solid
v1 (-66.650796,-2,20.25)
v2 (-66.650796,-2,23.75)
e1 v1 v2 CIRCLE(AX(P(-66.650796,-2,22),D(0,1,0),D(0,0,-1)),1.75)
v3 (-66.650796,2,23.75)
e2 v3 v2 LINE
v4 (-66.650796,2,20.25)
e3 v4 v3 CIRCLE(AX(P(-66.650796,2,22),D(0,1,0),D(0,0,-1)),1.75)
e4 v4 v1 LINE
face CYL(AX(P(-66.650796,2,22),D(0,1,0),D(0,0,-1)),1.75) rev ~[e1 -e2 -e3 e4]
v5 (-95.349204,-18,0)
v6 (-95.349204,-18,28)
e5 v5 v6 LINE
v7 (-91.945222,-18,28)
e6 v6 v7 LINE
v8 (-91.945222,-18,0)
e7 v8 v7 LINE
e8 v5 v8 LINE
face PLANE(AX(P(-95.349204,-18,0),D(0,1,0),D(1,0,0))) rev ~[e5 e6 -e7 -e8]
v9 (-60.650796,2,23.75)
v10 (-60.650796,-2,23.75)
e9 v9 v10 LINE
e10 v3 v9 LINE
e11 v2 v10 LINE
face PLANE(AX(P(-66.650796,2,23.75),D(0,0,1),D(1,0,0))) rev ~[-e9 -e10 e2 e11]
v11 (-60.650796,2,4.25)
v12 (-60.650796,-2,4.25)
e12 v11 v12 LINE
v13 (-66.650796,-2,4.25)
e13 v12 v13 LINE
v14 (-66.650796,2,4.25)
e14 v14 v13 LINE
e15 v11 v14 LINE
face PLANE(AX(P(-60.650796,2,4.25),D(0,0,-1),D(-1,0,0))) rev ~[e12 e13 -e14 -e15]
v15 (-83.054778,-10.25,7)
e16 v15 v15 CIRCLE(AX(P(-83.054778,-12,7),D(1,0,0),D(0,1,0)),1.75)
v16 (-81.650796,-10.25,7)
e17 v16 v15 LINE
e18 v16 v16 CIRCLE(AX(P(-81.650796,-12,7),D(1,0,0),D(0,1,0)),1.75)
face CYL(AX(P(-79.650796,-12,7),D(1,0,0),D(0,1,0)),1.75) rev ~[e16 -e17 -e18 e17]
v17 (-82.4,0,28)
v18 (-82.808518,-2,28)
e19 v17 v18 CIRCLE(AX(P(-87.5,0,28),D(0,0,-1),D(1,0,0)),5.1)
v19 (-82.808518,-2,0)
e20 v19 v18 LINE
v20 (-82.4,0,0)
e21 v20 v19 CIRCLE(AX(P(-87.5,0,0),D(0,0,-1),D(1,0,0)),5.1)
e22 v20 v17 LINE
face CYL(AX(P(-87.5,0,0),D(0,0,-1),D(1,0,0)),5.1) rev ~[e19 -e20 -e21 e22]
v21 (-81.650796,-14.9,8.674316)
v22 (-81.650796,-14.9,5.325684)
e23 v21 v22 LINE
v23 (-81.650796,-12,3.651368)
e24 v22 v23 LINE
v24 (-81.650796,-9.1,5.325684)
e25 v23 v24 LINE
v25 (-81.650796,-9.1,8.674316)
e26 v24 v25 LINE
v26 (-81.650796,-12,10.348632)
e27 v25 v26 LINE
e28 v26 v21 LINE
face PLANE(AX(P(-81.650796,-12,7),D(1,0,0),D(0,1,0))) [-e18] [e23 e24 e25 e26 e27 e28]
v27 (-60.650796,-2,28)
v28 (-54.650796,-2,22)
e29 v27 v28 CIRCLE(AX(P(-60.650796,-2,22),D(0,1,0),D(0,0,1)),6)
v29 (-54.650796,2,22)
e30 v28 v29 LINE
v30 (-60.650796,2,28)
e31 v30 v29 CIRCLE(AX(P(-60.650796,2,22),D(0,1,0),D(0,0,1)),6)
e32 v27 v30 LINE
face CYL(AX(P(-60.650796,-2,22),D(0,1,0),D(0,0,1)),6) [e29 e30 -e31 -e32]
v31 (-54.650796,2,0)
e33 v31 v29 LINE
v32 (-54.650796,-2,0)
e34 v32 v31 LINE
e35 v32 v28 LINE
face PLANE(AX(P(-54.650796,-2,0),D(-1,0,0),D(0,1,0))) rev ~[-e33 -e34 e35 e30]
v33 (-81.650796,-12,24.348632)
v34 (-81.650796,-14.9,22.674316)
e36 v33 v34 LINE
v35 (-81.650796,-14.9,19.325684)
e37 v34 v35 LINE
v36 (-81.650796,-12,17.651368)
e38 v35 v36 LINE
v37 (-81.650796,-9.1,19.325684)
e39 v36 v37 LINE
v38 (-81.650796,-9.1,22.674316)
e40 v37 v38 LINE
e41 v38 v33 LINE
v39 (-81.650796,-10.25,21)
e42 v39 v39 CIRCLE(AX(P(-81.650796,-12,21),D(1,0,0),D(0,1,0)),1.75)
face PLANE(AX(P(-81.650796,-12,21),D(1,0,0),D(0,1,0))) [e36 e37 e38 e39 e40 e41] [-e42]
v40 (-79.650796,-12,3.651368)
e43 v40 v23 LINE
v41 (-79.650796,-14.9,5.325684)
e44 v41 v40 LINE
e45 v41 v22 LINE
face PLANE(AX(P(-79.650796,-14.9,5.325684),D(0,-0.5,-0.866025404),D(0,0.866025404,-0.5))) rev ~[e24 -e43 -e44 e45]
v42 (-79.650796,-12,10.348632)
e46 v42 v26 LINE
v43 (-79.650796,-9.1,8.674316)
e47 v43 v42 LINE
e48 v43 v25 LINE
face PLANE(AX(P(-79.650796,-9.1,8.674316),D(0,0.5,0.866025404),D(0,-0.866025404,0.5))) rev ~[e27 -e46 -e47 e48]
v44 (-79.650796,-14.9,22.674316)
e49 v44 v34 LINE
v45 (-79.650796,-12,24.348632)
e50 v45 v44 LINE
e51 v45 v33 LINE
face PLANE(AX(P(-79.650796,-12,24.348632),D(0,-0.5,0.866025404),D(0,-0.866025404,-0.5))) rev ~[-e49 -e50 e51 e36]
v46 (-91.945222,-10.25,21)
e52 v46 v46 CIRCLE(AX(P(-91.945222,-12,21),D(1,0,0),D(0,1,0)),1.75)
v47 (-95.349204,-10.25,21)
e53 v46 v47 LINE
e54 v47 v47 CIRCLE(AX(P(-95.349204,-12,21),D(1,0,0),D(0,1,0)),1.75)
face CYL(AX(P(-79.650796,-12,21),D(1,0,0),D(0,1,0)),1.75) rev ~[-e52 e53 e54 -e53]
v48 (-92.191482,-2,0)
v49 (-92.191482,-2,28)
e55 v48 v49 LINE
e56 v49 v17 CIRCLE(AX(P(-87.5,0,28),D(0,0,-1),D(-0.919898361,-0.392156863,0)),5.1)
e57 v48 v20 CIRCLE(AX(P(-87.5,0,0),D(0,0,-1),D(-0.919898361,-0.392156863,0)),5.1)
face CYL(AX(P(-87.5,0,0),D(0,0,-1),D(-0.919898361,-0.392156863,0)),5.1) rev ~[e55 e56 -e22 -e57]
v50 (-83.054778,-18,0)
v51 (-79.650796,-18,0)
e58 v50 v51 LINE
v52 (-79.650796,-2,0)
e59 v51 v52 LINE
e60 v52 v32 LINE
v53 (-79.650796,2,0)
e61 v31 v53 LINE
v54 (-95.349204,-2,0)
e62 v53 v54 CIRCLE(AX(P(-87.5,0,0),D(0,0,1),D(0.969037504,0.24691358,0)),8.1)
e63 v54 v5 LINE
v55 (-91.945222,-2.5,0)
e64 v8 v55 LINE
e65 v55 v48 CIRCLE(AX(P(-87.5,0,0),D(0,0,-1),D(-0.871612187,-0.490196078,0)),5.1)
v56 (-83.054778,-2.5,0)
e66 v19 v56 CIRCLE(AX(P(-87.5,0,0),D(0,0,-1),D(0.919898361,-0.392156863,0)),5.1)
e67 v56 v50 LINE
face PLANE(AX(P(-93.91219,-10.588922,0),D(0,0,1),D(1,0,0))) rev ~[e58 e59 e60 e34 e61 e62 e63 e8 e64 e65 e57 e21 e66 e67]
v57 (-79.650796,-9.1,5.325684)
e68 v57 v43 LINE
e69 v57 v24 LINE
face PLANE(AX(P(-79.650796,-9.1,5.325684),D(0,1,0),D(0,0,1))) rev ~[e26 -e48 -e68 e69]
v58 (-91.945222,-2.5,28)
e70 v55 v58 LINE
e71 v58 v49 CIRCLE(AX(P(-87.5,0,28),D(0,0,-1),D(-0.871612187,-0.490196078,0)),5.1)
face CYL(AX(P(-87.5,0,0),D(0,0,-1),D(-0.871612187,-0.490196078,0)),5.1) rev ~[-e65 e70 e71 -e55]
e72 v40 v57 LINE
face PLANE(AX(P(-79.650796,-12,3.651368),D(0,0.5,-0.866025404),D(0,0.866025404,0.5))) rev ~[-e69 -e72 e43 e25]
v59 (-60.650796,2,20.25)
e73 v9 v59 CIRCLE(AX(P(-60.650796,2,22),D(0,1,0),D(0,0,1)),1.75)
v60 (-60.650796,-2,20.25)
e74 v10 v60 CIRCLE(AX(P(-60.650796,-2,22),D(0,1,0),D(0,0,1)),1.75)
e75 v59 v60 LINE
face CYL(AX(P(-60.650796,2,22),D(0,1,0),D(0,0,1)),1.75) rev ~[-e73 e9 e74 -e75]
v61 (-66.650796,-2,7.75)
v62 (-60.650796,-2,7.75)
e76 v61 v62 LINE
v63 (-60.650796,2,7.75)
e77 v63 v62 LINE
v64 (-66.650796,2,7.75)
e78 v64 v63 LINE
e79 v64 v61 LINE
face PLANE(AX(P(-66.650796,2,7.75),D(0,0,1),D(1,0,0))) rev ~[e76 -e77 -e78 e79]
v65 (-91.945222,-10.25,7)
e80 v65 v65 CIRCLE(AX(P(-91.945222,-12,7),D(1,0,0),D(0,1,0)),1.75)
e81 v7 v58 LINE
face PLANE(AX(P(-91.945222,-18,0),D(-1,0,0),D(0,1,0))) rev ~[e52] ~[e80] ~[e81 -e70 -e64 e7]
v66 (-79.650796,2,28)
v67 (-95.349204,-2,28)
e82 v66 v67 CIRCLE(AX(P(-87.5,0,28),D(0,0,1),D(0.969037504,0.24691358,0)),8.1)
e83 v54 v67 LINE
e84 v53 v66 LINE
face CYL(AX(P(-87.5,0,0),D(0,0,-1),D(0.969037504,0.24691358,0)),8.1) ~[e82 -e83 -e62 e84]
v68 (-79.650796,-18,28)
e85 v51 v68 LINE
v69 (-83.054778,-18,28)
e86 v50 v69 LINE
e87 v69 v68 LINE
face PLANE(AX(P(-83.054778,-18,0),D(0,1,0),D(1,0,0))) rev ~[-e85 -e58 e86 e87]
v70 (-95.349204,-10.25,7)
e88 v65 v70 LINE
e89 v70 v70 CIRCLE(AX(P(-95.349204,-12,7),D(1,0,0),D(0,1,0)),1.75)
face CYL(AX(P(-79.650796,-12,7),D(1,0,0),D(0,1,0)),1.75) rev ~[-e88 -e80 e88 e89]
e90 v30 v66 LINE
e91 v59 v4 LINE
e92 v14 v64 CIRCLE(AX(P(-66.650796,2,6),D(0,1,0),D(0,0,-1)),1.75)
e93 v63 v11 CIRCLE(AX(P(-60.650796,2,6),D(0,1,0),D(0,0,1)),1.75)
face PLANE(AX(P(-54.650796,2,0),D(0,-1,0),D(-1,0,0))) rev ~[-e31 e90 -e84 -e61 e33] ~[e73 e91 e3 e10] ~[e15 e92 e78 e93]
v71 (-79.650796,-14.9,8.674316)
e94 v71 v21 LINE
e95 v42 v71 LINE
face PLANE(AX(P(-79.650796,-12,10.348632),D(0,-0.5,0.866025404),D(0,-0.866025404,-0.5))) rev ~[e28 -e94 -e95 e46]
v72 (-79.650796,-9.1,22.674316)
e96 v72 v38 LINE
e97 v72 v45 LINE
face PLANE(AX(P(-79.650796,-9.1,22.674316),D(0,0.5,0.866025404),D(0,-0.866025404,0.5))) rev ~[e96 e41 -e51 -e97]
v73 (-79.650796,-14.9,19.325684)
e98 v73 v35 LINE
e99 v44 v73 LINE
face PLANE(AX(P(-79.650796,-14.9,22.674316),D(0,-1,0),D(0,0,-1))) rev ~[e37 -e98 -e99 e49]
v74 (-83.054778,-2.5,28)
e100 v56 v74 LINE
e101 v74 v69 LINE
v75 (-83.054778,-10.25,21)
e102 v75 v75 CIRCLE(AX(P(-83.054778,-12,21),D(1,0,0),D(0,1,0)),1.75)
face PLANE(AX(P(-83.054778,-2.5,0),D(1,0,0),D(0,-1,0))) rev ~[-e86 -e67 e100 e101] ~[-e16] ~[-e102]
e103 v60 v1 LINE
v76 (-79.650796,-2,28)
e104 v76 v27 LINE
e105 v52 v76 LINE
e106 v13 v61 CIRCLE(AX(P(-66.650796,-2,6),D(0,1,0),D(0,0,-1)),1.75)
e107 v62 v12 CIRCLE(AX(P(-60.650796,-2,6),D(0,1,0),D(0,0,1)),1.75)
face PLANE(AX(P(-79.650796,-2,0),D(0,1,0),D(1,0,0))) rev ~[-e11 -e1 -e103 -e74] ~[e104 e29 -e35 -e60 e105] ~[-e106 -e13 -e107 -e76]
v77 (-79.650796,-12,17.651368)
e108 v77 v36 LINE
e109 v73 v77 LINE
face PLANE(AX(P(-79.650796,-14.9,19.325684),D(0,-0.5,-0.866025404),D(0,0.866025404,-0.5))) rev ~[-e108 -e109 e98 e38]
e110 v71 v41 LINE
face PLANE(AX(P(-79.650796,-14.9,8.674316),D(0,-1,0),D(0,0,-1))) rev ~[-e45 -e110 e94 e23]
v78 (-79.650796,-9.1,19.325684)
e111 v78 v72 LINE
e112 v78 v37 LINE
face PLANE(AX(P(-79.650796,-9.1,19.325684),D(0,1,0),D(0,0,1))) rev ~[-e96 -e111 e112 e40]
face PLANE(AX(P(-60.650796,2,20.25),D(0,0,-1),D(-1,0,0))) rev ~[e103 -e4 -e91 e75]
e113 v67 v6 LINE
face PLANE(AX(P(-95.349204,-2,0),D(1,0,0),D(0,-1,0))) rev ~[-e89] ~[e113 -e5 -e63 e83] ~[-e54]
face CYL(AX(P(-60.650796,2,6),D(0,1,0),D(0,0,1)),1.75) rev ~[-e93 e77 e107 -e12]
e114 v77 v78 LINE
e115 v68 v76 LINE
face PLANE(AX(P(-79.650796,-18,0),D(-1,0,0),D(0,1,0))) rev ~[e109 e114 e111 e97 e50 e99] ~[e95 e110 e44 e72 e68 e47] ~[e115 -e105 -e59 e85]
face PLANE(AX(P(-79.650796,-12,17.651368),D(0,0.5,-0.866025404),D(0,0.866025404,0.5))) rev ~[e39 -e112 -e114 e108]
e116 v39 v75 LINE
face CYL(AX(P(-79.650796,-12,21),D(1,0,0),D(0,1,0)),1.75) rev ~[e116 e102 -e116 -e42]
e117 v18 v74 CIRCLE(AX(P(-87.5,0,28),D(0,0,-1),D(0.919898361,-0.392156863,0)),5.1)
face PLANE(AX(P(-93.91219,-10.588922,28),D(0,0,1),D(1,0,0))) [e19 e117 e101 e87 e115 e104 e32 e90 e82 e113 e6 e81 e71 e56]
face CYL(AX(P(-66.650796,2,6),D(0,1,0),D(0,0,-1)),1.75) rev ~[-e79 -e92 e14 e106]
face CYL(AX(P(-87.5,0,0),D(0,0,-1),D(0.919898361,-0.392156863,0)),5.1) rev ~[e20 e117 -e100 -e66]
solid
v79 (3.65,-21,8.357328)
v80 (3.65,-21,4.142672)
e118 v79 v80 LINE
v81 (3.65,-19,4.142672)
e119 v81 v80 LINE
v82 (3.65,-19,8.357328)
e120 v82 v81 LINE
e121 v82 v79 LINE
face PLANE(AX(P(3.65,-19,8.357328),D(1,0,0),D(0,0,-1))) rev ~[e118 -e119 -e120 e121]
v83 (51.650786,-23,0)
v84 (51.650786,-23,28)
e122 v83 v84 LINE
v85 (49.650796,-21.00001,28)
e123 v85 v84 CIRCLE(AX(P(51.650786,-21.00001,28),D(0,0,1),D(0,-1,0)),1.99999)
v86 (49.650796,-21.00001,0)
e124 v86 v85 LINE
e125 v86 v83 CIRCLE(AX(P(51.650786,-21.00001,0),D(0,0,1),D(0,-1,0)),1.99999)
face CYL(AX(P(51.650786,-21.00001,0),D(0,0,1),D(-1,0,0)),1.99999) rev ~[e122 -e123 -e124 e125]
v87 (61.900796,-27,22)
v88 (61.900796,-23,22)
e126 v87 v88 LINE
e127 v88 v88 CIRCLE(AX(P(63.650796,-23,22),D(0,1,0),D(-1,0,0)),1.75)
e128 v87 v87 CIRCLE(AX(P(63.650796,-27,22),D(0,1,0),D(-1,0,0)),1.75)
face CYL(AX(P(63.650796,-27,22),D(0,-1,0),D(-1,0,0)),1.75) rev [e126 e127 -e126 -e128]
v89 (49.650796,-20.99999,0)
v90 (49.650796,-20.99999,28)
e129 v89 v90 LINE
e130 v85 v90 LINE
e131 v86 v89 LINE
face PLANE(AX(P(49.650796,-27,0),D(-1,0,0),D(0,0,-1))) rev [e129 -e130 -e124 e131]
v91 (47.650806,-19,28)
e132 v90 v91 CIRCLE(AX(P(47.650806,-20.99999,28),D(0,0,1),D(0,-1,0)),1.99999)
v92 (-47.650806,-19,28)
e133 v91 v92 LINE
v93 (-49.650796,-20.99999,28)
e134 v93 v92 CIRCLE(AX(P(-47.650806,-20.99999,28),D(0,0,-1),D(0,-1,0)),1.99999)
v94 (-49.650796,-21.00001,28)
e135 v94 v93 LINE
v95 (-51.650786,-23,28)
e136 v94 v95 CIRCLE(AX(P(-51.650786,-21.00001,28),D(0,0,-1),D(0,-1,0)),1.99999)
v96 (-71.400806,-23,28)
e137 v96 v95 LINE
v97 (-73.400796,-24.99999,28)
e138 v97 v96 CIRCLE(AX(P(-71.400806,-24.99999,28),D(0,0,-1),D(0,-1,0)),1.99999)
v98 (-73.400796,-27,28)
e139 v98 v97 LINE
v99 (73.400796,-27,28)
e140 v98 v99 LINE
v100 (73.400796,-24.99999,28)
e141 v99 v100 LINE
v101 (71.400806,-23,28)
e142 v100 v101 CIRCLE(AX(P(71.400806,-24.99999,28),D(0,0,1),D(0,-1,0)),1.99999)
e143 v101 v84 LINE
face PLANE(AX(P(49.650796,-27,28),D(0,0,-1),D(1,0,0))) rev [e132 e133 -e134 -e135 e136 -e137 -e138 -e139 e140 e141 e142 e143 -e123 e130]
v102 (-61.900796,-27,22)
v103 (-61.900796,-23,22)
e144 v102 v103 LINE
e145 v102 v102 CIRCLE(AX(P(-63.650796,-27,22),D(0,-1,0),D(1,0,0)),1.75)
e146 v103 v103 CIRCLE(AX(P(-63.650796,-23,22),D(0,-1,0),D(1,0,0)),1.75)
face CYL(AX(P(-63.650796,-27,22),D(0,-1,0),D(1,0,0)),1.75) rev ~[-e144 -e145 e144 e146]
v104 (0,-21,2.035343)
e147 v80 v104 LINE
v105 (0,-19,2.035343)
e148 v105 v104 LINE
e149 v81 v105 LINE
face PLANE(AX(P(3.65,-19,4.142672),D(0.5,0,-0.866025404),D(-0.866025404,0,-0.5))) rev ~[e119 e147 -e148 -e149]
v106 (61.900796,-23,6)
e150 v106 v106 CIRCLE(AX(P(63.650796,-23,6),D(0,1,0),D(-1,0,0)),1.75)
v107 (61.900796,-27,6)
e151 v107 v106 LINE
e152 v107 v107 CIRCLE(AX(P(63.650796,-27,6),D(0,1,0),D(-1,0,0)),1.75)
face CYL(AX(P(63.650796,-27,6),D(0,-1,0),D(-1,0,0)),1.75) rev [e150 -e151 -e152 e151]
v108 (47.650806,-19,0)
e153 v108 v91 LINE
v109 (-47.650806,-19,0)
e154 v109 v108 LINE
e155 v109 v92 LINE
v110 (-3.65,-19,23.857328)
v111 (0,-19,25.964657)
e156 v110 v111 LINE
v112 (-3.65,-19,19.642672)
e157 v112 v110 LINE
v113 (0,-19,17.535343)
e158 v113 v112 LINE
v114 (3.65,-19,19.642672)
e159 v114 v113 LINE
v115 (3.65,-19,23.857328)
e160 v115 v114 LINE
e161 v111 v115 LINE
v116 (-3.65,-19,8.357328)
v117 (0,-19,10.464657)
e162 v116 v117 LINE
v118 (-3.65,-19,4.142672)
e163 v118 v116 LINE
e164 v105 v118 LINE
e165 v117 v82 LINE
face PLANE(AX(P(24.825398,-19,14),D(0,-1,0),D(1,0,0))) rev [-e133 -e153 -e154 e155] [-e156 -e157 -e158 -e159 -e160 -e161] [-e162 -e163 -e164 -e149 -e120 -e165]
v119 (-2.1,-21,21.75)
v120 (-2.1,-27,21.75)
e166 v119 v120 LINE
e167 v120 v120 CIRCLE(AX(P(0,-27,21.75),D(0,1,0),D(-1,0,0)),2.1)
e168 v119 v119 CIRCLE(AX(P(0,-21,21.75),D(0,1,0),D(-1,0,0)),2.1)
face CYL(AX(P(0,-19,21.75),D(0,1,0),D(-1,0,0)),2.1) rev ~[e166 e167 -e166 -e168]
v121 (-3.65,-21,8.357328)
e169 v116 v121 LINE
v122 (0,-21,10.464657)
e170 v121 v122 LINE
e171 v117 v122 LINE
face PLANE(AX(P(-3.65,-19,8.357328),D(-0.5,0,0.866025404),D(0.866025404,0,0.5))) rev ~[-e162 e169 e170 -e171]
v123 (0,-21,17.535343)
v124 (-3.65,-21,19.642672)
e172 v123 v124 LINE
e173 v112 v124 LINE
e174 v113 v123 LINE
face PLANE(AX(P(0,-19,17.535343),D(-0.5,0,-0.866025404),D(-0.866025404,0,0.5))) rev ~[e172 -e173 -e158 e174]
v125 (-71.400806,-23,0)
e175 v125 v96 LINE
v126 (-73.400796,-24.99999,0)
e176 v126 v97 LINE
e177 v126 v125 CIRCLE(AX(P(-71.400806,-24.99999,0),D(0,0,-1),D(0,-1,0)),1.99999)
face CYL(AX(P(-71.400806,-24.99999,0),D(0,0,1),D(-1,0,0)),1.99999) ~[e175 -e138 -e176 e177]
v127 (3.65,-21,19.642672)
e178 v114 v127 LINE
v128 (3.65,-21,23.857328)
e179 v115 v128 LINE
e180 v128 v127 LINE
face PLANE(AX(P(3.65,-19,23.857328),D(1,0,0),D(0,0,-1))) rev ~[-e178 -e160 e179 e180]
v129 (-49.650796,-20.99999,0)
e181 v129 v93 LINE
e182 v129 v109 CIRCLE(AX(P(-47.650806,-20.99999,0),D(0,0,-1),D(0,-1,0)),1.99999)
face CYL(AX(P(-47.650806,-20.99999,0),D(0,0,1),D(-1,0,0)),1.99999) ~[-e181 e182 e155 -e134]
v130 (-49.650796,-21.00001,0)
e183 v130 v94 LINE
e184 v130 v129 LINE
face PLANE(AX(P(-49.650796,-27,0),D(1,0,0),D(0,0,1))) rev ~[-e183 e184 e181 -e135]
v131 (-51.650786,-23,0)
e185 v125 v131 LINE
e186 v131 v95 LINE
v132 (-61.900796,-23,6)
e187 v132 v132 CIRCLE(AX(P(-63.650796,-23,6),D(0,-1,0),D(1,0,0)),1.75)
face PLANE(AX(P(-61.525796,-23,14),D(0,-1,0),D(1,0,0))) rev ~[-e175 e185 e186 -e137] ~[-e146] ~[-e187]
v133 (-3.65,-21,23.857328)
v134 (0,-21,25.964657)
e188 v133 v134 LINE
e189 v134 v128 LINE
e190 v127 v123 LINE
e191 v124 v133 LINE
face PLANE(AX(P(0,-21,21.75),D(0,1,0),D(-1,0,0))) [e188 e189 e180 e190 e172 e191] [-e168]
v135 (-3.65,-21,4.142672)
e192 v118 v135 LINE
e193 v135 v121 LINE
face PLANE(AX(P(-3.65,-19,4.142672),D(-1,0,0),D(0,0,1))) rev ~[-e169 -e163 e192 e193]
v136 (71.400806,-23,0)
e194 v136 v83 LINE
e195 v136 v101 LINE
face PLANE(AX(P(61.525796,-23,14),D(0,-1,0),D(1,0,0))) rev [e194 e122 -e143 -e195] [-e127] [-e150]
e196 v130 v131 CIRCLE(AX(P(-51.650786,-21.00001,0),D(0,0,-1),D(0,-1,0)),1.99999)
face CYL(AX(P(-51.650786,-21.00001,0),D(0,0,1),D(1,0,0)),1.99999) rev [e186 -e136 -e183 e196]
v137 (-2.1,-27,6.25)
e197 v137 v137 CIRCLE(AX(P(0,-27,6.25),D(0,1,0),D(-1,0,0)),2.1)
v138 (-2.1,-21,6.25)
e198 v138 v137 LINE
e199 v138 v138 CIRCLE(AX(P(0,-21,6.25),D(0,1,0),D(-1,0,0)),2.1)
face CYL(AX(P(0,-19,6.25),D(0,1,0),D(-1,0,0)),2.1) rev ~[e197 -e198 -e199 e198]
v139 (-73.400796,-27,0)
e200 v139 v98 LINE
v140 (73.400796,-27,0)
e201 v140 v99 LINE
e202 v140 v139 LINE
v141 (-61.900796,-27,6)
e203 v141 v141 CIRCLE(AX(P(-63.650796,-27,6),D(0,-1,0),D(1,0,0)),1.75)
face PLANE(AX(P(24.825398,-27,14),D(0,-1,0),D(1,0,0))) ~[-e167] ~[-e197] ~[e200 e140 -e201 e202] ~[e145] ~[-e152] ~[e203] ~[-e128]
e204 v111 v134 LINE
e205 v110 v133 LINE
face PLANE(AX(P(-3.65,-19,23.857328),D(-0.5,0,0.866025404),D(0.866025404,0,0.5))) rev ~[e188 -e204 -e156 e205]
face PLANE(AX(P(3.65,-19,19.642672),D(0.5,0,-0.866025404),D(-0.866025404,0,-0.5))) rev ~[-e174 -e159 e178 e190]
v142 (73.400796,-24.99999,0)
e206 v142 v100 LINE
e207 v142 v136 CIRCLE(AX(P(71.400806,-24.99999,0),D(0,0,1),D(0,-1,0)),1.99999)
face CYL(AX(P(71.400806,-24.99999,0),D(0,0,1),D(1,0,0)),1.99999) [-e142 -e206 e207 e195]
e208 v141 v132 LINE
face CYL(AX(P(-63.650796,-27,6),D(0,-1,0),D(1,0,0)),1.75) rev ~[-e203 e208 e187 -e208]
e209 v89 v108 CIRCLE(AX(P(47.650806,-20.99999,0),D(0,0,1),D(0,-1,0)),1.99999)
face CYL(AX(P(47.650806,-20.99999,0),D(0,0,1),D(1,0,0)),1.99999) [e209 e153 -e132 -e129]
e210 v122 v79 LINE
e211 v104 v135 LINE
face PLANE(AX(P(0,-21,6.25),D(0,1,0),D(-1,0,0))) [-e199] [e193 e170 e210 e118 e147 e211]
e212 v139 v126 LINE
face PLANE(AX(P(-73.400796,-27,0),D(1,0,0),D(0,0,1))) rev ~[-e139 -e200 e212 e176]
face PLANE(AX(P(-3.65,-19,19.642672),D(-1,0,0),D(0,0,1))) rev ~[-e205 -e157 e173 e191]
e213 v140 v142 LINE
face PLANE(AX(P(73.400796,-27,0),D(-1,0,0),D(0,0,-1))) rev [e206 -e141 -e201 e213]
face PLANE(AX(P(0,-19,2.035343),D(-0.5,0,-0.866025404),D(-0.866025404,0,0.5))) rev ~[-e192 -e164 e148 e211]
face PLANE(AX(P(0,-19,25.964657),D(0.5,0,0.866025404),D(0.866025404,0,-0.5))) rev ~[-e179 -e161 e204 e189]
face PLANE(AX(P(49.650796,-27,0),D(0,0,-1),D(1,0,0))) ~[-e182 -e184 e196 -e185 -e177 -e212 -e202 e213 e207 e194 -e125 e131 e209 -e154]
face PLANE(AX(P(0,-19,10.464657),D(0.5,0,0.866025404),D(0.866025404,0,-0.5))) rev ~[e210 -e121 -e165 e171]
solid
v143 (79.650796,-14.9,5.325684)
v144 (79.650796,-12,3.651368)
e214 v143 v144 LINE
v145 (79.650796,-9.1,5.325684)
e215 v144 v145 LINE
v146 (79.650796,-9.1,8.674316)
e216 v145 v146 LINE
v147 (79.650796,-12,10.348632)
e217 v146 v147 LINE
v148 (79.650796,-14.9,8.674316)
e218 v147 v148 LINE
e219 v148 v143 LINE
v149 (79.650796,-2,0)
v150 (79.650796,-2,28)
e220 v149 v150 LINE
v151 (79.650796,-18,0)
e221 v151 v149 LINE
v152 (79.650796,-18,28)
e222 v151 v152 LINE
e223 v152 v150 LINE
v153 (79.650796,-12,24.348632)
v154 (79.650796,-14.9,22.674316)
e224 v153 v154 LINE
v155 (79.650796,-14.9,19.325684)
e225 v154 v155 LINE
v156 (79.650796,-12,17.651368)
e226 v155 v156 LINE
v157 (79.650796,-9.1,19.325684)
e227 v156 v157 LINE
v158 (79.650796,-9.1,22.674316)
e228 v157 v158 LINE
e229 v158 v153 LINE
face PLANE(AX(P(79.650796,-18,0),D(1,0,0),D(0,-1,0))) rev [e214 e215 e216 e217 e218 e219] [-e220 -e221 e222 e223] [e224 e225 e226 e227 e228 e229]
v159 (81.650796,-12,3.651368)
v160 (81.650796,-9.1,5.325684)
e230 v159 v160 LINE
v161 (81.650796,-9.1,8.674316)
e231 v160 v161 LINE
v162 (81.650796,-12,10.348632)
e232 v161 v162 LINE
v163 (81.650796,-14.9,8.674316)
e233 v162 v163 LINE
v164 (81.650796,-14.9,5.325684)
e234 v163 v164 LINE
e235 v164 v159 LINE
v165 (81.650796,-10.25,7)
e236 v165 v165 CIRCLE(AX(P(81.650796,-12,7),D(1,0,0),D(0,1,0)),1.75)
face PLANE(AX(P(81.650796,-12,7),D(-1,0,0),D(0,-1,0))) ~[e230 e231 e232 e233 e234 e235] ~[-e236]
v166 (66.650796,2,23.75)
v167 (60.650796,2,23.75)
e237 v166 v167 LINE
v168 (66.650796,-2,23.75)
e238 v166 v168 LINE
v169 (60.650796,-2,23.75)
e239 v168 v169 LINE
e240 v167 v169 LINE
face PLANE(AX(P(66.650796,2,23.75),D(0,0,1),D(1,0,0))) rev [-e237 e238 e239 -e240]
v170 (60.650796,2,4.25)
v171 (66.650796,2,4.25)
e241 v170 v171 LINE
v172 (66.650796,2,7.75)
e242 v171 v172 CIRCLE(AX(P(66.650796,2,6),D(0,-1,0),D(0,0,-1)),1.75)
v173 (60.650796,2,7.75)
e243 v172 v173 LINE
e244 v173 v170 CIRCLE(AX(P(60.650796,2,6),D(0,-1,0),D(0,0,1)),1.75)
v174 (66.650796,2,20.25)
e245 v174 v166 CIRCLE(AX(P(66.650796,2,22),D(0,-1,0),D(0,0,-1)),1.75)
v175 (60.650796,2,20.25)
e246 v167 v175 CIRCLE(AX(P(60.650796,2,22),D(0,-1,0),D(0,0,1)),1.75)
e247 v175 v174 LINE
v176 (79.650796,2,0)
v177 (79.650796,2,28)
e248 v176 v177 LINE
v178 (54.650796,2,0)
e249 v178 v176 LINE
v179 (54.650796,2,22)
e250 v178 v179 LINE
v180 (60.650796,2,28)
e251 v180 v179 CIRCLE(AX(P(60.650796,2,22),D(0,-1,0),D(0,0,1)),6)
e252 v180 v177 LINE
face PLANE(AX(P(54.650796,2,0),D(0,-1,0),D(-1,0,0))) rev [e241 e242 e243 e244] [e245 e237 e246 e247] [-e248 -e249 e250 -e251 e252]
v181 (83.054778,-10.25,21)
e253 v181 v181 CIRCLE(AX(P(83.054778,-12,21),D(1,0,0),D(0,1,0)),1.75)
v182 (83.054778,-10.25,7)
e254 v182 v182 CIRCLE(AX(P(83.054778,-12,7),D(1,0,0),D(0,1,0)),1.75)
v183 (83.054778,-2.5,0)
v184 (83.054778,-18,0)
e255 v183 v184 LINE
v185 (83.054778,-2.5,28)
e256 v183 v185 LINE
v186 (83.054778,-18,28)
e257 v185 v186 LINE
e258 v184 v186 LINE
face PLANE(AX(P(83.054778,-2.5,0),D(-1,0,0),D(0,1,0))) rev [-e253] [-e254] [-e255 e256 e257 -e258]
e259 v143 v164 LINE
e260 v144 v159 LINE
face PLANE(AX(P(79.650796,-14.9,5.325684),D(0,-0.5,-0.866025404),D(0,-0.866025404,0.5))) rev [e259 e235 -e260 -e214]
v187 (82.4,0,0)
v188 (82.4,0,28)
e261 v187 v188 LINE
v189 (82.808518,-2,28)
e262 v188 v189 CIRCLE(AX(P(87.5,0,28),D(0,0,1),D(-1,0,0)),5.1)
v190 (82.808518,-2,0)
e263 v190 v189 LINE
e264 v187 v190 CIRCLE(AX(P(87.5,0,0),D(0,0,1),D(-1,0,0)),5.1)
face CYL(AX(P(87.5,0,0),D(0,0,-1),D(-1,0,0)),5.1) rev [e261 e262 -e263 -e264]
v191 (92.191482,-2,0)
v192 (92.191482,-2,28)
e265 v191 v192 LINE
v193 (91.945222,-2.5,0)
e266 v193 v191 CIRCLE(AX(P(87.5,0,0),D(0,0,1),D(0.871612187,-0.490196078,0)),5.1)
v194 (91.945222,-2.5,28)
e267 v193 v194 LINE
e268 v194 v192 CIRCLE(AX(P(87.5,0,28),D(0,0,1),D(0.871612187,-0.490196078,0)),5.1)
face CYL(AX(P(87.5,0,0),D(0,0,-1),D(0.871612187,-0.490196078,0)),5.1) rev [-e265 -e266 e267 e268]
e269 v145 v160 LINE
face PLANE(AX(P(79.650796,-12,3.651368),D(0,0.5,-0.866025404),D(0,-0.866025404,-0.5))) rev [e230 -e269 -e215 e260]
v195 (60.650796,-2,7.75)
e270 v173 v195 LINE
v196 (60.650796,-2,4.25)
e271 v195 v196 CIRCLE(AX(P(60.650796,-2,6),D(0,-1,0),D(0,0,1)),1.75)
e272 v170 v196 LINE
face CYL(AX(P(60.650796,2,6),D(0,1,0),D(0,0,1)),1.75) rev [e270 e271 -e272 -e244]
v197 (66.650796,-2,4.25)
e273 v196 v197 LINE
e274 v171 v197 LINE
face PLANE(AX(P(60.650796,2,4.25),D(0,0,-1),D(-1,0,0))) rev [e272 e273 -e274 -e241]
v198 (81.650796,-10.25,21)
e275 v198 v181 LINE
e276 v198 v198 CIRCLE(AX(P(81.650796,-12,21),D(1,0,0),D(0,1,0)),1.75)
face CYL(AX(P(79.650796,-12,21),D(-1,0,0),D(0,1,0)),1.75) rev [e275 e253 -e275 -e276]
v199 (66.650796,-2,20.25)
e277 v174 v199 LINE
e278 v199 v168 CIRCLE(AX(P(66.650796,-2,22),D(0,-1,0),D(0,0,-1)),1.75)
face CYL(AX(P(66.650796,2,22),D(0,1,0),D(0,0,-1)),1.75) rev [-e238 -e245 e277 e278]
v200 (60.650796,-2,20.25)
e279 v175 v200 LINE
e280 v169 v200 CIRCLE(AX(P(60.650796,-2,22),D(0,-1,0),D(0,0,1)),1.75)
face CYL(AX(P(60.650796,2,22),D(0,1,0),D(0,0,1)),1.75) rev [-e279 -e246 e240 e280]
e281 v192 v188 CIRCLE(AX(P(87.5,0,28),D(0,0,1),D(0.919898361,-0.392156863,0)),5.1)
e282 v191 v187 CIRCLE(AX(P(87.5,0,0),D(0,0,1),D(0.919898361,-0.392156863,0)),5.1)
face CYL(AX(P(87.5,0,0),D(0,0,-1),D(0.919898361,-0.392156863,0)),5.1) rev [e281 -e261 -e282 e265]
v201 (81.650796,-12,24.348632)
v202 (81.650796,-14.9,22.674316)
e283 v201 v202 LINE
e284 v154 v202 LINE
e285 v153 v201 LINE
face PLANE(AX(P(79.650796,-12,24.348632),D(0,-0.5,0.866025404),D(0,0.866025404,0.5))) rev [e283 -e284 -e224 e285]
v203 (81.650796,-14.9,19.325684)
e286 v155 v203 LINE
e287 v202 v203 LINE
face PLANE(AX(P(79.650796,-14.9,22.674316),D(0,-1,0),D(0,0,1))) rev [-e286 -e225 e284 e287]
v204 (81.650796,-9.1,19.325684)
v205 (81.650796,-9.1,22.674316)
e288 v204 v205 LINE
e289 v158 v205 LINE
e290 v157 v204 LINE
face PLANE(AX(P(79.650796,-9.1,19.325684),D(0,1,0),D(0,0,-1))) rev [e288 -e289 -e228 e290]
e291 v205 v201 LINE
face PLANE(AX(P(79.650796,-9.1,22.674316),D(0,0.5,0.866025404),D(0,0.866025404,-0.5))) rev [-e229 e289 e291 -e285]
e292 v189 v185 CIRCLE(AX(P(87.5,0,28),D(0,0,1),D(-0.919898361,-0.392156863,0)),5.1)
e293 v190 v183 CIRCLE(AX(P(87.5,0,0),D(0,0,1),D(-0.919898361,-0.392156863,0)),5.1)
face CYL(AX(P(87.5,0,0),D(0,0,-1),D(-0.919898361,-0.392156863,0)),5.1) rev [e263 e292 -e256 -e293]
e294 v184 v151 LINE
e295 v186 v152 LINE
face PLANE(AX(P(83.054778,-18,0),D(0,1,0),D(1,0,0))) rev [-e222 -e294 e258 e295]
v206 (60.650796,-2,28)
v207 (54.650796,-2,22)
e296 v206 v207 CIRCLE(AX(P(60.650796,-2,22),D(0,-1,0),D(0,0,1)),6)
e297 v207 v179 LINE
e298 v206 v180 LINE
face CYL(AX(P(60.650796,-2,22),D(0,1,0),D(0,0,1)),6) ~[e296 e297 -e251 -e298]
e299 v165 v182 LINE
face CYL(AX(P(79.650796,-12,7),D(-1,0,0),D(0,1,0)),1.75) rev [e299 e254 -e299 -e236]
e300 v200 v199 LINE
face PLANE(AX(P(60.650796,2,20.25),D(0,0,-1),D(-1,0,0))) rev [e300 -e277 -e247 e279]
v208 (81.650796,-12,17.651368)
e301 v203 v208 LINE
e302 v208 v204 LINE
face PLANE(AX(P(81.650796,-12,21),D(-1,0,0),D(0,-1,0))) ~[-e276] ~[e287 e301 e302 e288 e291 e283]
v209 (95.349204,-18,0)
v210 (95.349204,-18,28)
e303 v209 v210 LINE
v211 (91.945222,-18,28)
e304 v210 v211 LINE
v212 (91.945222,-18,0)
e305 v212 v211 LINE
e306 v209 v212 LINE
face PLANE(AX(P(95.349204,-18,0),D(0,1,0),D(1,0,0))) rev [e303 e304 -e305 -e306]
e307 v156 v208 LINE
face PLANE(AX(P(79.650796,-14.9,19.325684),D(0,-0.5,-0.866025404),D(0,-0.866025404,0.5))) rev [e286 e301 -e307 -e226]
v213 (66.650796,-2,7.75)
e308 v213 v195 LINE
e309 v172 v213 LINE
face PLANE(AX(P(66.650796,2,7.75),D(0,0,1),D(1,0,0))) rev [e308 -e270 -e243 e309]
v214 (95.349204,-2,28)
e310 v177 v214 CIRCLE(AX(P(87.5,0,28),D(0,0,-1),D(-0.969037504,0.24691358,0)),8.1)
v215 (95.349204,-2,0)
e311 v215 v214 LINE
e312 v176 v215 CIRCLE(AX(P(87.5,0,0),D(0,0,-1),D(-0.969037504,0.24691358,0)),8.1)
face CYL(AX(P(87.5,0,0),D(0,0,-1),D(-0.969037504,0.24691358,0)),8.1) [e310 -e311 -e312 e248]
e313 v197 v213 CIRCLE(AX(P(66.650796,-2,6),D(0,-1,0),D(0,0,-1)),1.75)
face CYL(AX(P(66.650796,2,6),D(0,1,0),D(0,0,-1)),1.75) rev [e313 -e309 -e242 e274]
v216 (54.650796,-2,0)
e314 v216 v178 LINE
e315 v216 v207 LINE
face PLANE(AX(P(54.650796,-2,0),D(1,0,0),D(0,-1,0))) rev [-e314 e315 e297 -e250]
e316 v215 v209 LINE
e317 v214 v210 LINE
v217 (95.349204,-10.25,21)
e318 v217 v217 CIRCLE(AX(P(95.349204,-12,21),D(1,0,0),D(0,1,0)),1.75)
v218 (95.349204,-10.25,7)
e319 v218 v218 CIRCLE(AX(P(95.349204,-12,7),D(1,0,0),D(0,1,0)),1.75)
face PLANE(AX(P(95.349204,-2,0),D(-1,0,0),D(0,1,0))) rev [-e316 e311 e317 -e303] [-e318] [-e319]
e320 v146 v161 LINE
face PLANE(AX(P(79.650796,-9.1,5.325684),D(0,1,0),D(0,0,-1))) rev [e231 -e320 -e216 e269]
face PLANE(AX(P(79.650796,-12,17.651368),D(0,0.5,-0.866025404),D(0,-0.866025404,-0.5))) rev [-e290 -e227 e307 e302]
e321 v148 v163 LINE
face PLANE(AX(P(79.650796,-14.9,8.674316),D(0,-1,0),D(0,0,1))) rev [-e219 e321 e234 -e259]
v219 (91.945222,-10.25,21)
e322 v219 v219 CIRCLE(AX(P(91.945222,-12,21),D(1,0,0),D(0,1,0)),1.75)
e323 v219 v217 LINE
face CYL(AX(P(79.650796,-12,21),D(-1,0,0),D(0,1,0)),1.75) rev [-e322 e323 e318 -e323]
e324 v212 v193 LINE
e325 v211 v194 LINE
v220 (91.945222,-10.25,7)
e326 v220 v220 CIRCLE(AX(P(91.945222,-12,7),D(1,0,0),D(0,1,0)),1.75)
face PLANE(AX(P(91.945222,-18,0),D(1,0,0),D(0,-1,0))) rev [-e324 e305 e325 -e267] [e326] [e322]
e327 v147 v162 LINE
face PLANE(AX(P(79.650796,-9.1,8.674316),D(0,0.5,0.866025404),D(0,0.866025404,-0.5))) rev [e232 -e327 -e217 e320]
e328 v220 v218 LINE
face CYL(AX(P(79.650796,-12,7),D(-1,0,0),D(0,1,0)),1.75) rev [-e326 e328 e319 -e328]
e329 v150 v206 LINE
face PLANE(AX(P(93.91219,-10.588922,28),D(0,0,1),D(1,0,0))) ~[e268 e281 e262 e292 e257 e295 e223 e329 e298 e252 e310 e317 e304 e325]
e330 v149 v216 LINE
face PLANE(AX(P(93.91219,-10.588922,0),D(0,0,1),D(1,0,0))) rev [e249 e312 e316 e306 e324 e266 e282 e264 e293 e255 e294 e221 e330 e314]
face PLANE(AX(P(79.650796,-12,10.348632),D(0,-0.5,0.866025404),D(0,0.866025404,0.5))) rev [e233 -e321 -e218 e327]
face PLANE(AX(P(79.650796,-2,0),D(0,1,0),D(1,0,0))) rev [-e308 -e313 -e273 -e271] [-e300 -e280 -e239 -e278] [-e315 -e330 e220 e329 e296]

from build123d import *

# Parameters (mm, degrees)
F1_DEPTH  = 28
F2_R      = 1.75
F4_DEPTH  = 2
F5_DEPTH  = 25
F6_DEPTH  = 25
F7_R      = 6
F10_W     = 23.75
F10_H     = 28
F10_R     = 1.75
F11_DEPTH = 4
F10_W_2   = 49.6507962187
F12_DEPTH = 8
F13_R     = 1.99999
F15_R     = 2.1
F16_DEPTH = 2
F17_DEPTH = 25


# Not quite as in the source:
# - a fillet or chamfer is up to 0.001 mm smaller than in the source, because OpenCascade refuses the exact size


with BuildPart() as f1:
    # F0 (on Top) → F1 (new body)
    with BuildSketch(Plane.XY):
        with BuildLine():
            Line((-91.9452221542, -18), (-91.9452221542, -6.7712628069))
            ThreePointArc((-91.9452221542, -6.7712628069), (-94.0938960004, -4.7043103146), (-95.3492037813, -2))
            Line((-95.3492037813, -2), (-95.3492037813, -18))
            Line((-95.3492037813, -18), (-91.9452221542, -18))
        make_face()
        with BuildLine():
            Line((-91.9452221542, -6.7712628069), (-91.9452221542, -2.5))
            ThreePointArc((-91.9452221542, -2.5), (-92.0751873258, -2.2533665778), (-92.1914816423, -2))
            Line((-92.1914816423, -2), (-95.3492037813, -2))
            ThreePointArc((-95.3492037813, -2), (-94.0938960004, -4.7043103146), (-91.9452221542, -6.7712628069))
        make_face()
        with BuildLine():
            Line((-95.3492037813, -2), (-92.1914816423, -2))
            ThreePointArc((-92.1914816423, -2), (-88.5206477415, 4.9968268119), (-82.4, 0))
            ThreePointArc((-82.4, 0), (-82.5031731881, -1.0206477415), (-82.8085183577, -2))
            Line((-82.8085183577, -2), (-79.6507962187, -2))
            Line((-79.6507962187, -2), (-79.6507962187, 2))
            ThreePointArc((-79.6507962187, 2), (-89.5, 7.8492037813), (-95.3492037813, -2))
        make_face()
        with BuildLine():
            ThreePointArc((-79.6507962187, -2), (-80.9061039996, -4.7043103146), (-83.0547778458, -6.7712628069))
            Line((-83.0547778458, -6.7712628069), (-83.0547778458, -18))
            Line((-83.0547778458, -18), (-79.6507962187, -18))
            Line((-79.6507962187, -18), (-79.6507962187, -2))
        make_face()
        with BuildLine():
            ThreePointArc((-82.8085183577, -2), (-82.9248126742, -2.2533665778), (-83.0547778458, -2.5))
            Line((-83.0547778458, -2.5), (-83.0547778458, -6.7712628069))
            ThreePointArc((-83.0547778458, -6.7712628069), (-80.9061039996, -4.7043103146), (-79.6507962187, -2))
            Line((-79.6507962187, -2), (-82.8085183577, -2))
        make_face()
        with BuildLine():
            ThreePointArc((-79.4, 0), (-79.4629436163, -1.0078316753), (-79.6507962187, -2))
            Line((-79.6507962187, -2), (-54.6507962187, -2))
            Line((-54.6507962187, -2), (-54.6507962187, 2))
            Line((-54.6507962187, 2), (-79.6507962187, 2))
            ThreePointArc((-79.6507962187, 2), (-79.4629436163, 1.0078316753), (-79.4, 0))
        make_face()
        with BuildLine():
            Line((-79.6507962187, 2), (-79.6507962187, -2))
            ThreePointArc((-79.6507962187, -2), (-79.4629436163, -1.0078316753), (-79.4, 0))
            ThreePointArc((-79.4, 0), (-79.4629436163, 1.0078316753), (-79.6507962187, 2))
        make_face()
    extrude(amount=F1_DEPTH)

    # F2 (on face) → F4 (cut)
    with BuildSketch(Plane.YZ.offset(-79.6507962187)):
        Polygon((-14.9, 19.3256842194), (-12, 17.6513684387), (-9.1, 19.3256842194), (-9.1, 22.6743157806), (-12, 24.3486315613), (-14.9, 22.6743157806), align=None)
        with Locations((-12, 21)):
            Circle(F2_R, mode=Mode.SUBTRACT)
        Polygon((-9.1, 8.6743157806), (-12, 10.3486315613), (-14.9, 8.6743157806), (-14.9, 5.3256842194), (-12, 3.6513684387), (-9.1, 5.3256842194), align=None)
        with Locations((-12, 7)):
            Circle(F2_R, mode=Mode.SUBTRACT)
    extrude(amount=-F4_DEPTH, mode=Mode.SUBTRACT)

    # F5 (cut): faces of the model
    f5_faces = [f1.faces().sort_by_distance(p)[0] for p in [
        (-79.6507962187, -12, 21),
        (-79.6507962187, -12, 7),
    ]]
    extrude(f5_faces, amount=-F5_DEPTH, mode=Mode.SUBTRACT)

    # F3 (on face) → F6 (cut)
    with BuildSketch(Plane(origin=(0, 2, 0), x_dir=(-1, 0, 0), z_dir=(0, 1, 0))):
        with BuildLine():
            ThreePointArc((60.6507962187, 23.75), (58.9007962187, 22), (60.6507962187, 20.25))
            Line((60.6507962187, 20.25), (66.6507962187, 20.25))
            ThreePointArc((66.6507962187, 20.25), (68.4007962187, 22), (66.6507962187, 23.75))
            Line((66.6507962187, 23.75), (60.6507962187, 23.75))
        make_face()
        with BuildLine():
            ThreePointArc((60.6507962187, 7.75), (58.9007962187, 6), (60.6507962187, 4.25))
            Line((60.6507962187, 4.25), (66.6507962187, 4.25))
            ThreePointArc((66.6507962187, 4.25), (68.4007962187, 6), (66.6507962187, 7.75))
            Line((66.6507962187, 7.75), (60.6507962187, 7.75))
        make_face()
    extrude(amount=-F6_DEPTH, mode=Mode.SUBTRACT)

    # F7
    f7_edges = [f1.edges().sort_by_distance(p)[0] for p in [
        (-54.650796, 0, 28),
    ]]
    fillet(f7_edges, radius=F7_R)


with BuildPart() as f8_1:
    # F8: instance of F1
    add(f1.part.mirror(Plane.YZ))


with BuildPart() as f11:
    # F10 (on offset) → F11 (new body)
    with BuildSketch(Plane.XZ.offset(27)):
        with Locations((-61.5257962187, 14)):
            Rectangle(F10_W, F10_H)
        with Locations((-63.6507962187, 6)):
            Circle(F10_R, mode=Mode.SUBTRACT)
        with Locations((-63.6507962187, 22)):
            Circle(F10_R, mode=Mode.SUBTRACT)
    extrude(amount=-F11_DEPTH)

    # F10 (on offset) → F12 (join)
    with BuildSketch(Plane.XZ.offset(27)):
        with Locations((-24.8253981094, 14)):
            Rectangle(F10_W_2, F10_H)
    extrude(amount=-F12_DEPTH)

    # F13 (radius 2 in the source; OpenCascade refuses exactly that, so slightly less here)
    f13_edges = [f11.edges().sort_by_distance(p)[0] for p in [
        (-73.400796, -23, 14),
        (-49.650796, -19, 14),
        (-49.650796, -23, 14),
    ]]
    fillet(f13_edges, radius=F13_R)

    # F14: F11 across plane


with BuildPart() as f11_1:
    add(f11.part)
    add(f11.part.mirror(Plane.YZ))

    # F15 (on face) → F16 (cut)
    with BuildSketch(Plane(origin=(0, -19, 0), x_dir=(-1, 0, 0), z_dir=(0, 1, 0))):
        Polygon((3.65, 8.3573284825), (0, 10.4646569651), (-3.65, 8.3573284825), (-3.65, 4.1426715175), (0, 2.0353430349), (3.65, 4.1426715175), align=None)
        with Locations((0, 6.25)):
            Circle(F15_R, mode=Mode.SUBTRACT)
        Polygon((-3.65, 19.6426715175), (0, 17.5353430349), (3.65, 19.6426715175), (3.65, 23.8573284825), (0, 25.9646569651), (-3.65, 23.8573284825), align=None)
        with Locations((0, 21.75)):
            Circle(F15_R, mode=Mode.SUBTRACT)
    extrude(amount=-F16_DEPTH, mode=Mode.SUBTRACT)

    # F17 (cut): faces of the model
    f17_faces = [f11_1.faces().sort_by_distance(p)[0] for p in [
        (0, -19, 21.75),
        (0, -19, 6.25),
    ]]
    extrude(f17_faces, amount=-F17_DEPTH, mode=Mode.SUBTRACT)


solid = Compound([f1.part, f8_1.part, f11_1.part])
